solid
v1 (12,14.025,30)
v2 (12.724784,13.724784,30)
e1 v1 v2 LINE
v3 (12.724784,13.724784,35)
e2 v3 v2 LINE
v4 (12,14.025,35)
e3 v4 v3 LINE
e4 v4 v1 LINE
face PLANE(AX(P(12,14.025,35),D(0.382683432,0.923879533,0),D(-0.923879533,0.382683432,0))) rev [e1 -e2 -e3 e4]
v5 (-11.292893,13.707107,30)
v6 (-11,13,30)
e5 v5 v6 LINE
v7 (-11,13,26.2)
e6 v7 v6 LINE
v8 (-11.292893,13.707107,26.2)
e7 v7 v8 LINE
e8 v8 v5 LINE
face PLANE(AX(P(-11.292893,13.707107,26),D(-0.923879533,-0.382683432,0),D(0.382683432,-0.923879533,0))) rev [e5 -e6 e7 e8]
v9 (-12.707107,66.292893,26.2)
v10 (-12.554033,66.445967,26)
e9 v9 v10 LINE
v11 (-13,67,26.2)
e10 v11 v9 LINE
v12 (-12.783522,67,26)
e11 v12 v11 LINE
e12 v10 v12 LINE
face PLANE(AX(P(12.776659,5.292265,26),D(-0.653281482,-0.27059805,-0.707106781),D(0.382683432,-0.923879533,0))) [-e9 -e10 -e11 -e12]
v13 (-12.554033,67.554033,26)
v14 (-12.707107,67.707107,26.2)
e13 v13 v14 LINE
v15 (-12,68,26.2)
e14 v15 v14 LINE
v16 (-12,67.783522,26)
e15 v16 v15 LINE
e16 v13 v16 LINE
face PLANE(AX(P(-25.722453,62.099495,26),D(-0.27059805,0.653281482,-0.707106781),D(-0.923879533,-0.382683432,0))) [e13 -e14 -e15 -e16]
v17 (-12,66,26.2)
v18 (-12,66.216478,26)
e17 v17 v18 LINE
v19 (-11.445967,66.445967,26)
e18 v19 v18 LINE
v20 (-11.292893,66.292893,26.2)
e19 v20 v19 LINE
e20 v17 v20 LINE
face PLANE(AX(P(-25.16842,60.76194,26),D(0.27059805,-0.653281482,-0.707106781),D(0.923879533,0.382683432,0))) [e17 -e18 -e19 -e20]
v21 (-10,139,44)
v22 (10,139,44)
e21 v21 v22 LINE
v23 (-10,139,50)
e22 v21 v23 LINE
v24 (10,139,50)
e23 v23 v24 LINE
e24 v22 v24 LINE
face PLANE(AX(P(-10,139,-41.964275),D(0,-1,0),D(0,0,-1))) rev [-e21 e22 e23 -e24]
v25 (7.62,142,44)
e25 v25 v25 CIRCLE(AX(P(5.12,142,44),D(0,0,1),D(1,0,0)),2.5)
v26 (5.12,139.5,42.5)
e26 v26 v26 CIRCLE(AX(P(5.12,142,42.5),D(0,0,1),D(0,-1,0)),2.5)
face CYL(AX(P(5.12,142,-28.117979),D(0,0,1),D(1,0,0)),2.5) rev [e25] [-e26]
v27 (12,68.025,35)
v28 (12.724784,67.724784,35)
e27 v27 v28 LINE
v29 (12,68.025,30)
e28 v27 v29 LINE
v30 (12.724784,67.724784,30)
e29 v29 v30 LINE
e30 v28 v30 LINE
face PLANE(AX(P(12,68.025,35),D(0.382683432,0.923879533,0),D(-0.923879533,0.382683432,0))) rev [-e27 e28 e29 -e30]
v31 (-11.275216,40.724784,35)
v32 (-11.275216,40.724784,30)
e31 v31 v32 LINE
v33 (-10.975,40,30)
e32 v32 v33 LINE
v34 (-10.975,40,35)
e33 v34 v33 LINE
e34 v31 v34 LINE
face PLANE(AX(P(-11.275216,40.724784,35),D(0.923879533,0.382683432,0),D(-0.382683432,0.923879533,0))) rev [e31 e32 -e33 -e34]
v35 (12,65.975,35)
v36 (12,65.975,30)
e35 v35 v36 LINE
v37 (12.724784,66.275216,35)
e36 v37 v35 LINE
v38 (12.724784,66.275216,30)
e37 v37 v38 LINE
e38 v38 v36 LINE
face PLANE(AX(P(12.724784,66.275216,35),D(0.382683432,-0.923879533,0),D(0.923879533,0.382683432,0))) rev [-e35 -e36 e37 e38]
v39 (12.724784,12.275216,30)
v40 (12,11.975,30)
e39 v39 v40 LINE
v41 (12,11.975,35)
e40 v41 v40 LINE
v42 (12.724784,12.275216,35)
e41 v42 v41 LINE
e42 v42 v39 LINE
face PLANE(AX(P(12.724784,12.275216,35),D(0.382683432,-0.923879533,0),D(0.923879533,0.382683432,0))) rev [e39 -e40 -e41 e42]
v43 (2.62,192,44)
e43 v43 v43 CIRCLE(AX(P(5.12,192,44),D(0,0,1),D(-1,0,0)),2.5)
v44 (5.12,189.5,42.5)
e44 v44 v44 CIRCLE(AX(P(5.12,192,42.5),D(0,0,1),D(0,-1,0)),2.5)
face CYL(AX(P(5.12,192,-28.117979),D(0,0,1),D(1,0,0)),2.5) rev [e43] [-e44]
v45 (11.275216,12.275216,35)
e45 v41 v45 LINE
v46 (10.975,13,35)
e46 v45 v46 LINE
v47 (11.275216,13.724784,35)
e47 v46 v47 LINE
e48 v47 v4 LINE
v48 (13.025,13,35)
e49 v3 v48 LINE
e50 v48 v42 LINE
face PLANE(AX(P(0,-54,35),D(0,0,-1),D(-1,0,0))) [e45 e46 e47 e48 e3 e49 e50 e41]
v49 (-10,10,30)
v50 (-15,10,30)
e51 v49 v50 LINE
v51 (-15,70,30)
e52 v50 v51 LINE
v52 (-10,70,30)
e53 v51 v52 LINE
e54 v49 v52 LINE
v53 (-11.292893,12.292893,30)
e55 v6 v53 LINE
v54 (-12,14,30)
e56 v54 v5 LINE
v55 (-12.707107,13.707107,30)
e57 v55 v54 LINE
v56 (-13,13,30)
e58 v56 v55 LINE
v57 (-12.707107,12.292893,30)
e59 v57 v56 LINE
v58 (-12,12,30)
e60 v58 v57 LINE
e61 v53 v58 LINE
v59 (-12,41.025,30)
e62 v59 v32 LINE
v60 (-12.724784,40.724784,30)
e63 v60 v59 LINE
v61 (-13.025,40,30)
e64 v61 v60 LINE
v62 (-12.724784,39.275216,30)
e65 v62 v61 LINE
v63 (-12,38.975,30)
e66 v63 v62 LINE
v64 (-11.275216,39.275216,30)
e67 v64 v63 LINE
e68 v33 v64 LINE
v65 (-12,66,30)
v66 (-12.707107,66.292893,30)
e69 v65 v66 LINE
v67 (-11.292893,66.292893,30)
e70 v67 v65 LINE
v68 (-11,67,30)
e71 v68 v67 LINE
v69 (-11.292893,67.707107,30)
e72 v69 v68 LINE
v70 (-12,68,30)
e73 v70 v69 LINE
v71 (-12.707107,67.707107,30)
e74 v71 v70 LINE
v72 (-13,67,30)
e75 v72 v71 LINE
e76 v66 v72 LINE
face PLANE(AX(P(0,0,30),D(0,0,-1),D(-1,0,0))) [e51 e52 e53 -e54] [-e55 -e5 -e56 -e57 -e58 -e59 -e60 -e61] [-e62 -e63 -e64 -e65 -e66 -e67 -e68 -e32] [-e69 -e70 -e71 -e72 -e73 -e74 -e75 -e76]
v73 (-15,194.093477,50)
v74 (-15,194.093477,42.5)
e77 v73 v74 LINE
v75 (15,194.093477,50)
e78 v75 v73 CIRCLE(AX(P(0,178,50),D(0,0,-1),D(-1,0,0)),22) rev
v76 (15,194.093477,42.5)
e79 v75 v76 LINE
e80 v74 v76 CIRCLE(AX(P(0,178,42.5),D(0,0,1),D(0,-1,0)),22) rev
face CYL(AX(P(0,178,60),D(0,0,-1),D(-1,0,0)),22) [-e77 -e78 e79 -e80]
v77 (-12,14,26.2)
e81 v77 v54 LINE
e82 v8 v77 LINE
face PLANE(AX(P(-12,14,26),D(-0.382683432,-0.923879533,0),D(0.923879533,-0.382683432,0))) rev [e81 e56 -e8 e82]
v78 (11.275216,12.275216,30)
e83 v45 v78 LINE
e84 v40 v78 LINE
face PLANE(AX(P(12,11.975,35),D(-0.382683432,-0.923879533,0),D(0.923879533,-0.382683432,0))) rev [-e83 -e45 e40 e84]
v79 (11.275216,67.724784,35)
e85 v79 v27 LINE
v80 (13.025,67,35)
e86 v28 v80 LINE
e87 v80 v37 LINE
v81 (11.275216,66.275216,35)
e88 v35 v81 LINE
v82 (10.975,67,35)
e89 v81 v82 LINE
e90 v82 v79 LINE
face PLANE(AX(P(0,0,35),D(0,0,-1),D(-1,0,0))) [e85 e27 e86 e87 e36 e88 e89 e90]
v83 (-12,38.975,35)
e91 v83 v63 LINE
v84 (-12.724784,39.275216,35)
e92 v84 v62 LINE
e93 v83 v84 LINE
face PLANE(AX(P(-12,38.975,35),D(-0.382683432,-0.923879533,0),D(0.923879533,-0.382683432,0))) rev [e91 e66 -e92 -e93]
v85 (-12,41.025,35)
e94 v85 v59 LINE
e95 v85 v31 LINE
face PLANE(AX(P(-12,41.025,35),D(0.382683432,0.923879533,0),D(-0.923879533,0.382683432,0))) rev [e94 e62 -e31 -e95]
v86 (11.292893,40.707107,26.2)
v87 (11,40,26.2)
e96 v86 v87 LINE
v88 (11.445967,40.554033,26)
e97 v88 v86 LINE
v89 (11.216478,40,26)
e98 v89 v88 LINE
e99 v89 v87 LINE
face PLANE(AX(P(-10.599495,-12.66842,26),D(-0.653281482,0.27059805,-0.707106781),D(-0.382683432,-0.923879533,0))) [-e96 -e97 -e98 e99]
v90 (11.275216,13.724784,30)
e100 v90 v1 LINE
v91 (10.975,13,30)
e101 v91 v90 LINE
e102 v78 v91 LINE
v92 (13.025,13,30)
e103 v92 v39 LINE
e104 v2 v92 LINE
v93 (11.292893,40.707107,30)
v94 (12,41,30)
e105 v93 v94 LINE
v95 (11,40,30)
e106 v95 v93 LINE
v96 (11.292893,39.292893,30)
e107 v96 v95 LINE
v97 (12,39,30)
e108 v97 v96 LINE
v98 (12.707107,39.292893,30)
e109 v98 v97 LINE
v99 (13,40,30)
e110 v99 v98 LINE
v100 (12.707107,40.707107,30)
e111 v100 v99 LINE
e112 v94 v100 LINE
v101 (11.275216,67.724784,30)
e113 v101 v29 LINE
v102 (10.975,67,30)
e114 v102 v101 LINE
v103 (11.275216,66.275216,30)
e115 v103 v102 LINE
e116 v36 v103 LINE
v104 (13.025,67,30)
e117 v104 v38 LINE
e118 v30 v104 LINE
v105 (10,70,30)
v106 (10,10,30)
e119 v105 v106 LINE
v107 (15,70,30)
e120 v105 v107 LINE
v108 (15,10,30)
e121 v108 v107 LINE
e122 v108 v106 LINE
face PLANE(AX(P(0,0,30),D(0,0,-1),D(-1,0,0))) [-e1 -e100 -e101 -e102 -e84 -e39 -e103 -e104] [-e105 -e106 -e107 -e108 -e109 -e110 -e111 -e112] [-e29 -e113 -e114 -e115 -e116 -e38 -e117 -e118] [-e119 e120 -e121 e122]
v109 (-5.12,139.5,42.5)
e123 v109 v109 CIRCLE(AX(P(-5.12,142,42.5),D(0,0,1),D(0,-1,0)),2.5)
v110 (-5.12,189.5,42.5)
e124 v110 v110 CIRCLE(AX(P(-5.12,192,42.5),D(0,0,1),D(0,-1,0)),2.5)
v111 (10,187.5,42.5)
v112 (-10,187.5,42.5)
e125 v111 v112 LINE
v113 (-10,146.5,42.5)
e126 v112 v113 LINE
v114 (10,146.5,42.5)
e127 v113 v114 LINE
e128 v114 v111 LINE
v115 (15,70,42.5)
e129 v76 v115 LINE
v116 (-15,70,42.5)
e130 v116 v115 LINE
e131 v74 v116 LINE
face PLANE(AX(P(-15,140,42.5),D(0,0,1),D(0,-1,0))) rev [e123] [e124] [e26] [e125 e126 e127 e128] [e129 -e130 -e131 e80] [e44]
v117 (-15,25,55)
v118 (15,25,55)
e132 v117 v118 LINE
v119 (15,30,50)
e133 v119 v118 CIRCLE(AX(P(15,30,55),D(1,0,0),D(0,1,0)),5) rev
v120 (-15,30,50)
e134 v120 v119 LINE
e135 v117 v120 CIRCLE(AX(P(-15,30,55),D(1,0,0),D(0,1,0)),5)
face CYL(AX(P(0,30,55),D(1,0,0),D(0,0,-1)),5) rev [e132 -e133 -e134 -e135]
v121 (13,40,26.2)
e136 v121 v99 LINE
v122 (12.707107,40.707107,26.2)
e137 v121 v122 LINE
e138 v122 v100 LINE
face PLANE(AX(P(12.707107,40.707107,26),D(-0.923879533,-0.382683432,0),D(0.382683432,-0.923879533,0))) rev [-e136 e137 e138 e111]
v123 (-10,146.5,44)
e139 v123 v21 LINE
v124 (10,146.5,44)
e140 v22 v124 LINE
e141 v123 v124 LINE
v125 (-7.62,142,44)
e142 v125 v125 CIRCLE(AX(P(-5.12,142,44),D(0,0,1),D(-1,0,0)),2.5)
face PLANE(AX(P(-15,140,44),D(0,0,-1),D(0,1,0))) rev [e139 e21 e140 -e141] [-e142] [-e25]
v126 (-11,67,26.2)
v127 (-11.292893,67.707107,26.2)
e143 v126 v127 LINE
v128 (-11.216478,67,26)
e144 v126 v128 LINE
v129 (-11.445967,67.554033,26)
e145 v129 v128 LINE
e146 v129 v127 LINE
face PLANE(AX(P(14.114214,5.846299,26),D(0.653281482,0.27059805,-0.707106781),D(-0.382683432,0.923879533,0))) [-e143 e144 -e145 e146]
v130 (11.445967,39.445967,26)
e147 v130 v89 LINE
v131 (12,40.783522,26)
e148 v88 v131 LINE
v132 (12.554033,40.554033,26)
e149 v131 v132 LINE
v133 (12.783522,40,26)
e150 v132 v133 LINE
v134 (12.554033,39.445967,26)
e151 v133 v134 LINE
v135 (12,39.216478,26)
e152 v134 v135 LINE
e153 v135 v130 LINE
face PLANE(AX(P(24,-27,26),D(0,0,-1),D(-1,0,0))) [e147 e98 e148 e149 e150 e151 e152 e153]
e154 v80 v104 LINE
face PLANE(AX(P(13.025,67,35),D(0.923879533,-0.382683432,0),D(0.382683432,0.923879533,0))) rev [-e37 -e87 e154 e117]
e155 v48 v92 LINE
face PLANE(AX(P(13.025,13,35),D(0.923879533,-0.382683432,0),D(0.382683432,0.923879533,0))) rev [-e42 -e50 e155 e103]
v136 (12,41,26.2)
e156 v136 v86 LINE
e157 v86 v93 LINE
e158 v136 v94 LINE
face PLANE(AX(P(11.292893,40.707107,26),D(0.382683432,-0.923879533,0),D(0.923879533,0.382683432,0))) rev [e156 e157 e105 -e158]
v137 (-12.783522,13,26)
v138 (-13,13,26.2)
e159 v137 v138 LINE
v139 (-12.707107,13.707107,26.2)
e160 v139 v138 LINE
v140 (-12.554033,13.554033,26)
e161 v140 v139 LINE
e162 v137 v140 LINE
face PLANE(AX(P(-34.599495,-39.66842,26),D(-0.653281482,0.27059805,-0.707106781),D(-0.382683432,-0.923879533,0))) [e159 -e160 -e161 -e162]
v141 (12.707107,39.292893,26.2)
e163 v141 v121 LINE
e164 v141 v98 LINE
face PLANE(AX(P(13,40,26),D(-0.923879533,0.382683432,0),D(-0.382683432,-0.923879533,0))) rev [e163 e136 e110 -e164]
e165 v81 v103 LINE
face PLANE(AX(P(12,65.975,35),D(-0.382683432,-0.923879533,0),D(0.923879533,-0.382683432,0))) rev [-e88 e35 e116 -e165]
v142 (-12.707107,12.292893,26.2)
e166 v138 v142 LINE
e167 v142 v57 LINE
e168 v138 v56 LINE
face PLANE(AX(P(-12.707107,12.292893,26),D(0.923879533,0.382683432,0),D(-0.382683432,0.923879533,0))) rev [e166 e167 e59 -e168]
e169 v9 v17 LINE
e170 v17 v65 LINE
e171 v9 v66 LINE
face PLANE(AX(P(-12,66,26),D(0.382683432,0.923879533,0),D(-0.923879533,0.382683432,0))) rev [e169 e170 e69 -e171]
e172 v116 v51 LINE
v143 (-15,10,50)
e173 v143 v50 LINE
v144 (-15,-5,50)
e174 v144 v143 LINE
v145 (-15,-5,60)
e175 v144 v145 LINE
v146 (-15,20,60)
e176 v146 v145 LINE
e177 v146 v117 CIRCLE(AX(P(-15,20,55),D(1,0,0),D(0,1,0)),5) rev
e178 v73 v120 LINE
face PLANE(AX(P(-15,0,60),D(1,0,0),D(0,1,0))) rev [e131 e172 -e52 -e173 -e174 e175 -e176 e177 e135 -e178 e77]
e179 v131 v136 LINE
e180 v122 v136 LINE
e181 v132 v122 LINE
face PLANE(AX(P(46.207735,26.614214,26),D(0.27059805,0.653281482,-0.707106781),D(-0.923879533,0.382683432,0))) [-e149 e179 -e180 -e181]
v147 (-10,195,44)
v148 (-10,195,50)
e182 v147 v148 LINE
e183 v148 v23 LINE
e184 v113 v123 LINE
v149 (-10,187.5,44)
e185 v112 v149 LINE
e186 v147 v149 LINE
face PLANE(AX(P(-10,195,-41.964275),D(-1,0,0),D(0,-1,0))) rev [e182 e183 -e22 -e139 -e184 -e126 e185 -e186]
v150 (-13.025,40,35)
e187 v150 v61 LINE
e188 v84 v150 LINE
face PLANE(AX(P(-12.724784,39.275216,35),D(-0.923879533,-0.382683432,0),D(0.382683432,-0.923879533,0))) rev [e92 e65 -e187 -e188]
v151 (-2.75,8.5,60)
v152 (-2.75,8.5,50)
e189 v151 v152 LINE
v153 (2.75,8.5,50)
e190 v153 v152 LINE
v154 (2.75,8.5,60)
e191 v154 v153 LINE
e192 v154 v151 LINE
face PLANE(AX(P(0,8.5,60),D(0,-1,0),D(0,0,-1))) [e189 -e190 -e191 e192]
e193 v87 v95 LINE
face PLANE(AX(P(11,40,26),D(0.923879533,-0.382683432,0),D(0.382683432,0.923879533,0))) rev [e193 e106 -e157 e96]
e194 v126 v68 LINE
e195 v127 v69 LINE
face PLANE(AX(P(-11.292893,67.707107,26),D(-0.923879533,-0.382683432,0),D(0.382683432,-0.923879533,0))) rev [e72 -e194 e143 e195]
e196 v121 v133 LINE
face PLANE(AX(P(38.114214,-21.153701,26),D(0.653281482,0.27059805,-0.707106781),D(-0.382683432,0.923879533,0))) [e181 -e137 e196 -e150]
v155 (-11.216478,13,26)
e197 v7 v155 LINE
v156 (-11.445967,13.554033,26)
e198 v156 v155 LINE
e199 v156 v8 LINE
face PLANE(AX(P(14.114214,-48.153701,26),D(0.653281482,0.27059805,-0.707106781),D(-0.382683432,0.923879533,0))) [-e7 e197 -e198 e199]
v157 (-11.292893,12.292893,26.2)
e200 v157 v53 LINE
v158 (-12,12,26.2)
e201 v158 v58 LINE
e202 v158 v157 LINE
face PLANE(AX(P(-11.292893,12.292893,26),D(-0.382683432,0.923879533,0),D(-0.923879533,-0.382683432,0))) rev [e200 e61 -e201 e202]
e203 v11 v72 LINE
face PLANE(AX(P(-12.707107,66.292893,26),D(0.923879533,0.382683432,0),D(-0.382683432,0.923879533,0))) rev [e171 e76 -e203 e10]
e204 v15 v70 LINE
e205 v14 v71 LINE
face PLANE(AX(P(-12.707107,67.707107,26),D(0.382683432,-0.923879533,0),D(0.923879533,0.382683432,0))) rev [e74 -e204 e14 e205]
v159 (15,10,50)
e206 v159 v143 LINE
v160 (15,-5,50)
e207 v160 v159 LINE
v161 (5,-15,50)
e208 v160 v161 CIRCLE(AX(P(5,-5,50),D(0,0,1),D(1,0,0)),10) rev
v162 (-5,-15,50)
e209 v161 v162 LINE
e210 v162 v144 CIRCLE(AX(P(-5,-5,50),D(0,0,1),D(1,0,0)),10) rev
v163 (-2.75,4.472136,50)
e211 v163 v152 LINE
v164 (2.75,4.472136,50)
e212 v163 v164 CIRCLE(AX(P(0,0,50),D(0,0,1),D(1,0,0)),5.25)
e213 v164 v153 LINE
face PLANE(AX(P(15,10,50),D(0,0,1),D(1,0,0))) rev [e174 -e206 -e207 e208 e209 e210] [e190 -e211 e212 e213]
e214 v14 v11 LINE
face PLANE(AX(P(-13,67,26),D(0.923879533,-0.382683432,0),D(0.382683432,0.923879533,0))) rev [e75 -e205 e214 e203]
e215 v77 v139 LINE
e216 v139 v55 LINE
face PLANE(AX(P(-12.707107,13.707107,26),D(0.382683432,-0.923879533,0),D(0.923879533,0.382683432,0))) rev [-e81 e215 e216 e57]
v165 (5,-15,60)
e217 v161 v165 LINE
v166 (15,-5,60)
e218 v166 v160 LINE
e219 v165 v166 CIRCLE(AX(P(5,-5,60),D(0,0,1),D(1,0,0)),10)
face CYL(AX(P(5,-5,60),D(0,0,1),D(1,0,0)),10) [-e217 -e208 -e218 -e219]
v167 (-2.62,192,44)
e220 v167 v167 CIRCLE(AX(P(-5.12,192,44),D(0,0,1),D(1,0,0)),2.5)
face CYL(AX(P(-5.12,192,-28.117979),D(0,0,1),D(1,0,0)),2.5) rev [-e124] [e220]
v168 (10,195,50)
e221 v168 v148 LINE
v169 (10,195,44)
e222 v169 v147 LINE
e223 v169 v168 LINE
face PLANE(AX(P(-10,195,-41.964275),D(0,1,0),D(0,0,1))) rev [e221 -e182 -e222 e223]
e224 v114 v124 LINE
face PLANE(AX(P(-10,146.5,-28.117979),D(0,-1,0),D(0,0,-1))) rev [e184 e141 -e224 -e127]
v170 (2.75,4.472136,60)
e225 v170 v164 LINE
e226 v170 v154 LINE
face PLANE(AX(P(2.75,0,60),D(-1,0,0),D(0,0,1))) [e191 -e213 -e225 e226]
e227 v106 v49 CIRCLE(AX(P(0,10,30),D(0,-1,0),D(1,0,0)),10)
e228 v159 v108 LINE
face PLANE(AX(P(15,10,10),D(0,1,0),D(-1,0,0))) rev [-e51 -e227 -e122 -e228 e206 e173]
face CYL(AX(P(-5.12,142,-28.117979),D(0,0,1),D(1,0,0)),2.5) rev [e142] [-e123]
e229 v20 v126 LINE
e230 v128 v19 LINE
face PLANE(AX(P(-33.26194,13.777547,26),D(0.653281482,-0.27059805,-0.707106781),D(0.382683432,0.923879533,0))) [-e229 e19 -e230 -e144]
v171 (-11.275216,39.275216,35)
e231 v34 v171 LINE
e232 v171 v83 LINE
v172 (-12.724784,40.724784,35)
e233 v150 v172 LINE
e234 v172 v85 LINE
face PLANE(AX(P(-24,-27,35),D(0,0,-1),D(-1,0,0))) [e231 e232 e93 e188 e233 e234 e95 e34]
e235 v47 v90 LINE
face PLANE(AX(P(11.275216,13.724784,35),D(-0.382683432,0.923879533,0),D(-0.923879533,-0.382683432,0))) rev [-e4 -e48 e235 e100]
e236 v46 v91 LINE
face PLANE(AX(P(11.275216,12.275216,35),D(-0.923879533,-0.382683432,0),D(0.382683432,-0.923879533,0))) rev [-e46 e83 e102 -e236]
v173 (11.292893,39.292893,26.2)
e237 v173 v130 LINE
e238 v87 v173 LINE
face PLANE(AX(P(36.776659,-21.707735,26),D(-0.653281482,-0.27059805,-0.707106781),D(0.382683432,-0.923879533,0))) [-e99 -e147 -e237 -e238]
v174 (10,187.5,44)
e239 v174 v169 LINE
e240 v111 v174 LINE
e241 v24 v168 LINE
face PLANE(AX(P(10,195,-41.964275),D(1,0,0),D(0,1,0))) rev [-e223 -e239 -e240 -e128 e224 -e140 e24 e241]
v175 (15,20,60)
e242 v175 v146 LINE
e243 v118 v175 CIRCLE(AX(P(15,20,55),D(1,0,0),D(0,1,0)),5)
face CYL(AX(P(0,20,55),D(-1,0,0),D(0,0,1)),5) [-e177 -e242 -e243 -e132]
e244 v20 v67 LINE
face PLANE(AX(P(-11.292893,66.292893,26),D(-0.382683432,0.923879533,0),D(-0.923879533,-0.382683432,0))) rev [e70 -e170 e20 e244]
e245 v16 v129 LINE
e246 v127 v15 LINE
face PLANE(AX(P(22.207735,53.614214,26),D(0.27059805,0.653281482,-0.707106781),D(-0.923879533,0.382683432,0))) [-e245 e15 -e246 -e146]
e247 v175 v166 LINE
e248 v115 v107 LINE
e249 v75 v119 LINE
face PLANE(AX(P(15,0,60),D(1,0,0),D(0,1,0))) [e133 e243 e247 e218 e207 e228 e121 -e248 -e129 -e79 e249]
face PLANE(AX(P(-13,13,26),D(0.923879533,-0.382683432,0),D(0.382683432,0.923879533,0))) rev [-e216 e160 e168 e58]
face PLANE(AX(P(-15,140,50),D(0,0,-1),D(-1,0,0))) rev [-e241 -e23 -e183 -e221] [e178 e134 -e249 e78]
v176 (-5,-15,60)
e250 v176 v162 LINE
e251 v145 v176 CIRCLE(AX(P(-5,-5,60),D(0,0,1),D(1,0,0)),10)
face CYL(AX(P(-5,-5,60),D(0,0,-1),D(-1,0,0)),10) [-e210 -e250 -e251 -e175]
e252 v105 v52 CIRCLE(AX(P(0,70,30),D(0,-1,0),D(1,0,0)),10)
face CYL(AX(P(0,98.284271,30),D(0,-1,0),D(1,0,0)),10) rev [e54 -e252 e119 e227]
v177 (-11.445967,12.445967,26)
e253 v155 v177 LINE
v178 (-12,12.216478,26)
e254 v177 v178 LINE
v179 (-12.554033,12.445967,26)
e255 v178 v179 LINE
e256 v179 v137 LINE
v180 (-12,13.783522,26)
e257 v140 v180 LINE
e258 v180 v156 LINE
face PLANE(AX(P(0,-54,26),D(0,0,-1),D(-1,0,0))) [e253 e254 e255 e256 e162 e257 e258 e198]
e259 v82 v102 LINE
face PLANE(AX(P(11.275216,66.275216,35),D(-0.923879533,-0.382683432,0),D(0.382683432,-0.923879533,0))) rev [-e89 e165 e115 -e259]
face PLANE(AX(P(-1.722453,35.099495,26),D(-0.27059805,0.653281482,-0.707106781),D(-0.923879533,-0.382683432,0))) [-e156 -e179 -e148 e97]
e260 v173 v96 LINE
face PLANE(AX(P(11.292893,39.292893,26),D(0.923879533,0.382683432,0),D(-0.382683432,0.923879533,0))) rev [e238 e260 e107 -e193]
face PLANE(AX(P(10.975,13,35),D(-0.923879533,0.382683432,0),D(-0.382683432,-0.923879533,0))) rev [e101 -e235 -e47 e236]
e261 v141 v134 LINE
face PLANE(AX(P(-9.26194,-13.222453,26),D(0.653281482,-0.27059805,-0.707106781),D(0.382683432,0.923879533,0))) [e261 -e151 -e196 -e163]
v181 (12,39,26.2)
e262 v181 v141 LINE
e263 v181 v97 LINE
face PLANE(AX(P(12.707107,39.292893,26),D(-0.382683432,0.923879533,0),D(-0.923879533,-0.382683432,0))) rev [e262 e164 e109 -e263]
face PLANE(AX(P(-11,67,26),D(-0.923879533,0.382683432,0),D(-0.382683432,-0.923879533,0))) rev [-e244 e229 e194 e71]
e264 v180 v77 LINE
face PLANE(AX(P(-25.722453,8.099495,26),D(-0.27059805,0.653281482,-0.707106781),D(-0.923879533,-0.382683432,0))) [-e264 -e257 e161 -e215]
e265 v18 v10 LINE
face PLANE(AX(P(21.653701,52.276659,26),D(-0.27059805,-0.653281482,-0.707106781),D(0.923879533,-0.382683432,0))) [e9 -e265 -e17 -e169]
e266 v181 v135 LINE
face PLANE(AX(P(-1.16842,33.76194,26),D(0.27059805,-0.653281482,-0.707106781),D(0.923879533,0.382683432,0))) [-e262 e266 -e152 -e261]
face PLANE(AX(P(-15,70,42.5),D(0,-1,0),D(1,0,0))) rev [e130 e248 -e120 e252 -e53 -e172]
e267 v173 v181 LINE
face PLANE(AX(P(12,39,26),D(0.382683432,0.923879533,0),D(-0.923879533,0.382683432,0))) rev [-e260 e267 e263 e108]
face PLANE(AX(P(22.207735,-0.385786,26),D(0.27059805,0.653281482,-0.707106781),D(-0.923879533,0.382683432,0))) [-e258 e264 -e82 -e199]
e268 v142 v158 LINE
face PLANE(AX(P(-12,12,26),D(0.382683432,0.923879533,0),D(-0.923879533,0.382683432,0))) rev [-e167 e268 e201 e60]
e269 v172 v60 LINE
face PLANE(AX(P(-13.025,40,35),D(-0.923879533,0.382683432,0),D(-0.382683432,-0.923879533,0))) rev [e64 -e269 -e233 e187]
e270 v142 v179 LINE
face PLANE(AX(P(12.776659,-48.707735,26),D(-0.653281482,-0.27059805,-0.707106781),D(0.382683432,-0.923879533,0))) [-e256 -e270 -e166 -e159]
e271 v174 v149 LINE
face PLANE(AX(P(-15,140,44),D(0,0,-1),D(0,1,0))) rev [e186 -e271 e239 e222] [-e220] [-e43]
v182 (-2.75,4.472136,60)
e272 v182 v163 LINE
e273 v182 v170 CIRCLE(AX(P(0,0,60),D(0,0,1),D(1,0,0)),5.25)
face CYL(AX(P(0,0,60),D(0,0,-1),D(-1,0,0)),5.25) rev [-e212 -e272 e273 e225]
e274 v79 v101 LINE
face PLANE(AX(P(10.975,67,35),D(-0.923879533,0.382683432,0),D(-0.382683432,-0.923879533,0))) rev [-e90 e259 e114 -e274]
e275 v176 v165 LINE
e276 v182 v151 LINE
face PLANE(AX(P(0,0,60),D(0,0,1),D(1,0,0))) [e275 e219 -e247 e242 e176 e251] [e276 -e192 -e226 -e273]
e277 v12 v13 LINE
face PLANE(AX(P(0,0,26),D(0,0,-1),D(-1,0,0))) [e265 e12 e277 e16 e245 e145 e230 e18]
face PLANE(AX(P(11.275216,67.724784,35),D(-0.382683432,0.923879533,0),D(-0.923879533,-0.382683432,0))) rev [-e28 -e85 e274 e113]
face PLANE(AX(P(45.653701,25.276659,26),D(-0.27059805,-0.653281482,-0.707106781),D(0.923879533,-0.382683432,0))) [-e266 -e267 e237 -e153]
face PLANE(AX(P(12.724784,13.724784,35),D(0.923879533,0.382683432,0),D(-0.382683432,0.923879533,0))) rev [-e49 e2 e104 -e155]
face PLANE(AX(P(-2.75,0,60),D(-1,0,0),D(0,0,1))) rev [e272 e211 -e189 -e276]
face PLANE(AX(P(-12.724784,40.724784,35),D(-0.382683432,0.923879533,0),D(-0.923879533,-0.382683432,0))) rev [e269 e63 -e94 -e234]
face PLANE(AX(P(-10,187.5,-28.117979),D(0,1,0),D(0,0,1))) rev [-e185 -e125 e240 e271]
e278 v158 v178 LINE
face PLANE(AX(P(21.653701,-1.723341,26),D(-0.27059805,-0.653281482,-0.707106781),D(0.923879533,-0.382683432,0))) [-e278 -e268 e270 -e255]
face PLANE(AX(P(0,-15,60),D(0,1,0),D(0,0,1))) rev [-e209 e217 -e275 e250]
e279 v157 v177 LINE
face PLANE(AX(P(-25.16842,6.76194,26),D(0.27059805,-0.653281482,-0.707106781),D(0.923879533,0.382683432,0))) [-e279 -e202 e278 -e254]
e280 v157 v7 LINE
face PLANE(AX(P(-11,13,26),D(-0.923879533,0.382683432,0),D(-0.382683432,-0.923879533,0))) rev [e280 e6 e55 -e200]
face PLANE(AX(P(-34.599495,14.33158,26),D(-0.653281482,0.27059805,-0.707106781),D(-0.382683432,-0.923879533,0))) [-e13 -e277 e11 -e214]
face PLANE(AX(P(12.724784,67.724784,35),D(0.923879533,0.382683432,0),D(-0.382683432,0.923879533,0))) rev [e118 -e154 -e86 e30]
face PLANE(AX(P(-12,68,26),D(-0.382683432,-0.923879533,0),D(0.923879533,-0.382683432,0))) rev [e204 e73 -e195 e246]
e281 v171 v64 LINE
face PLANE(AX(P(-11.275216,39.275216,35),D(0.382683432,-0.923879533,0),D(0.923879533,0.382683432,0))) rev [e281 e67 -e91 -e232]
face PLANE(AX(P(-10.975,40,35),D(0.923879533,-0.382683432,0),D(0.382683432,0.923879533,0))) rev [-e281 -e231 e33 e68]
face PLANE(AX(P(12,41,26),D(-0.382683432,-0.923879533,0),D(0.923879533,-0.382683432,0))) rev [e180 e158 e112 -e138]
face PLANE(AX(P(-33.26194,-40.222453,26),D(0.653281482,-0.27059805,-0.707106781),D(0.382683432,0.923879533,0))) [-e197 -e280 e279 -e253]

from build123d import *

# Parameters (mm, degrees)
SKETCH2_W                              = 30
SKETCH2_H                              = 30
BOSS_EXTRUDE1_DEPTH                    = 60
FILLET1_R                              = 10
SKETCH3_W                              = 40
SKETCH3_H                              = 25
CUT_EXTRUDE1_DEPTH                     = 69.738635424
SKETCH6_W                              = 30
SKETCH6_H                              = 40
BOSS_EXTRUDE2_DEPTH                    = 125
SKETCH7_W                              = 30
SKETCH7_H                              = 10
BOSS_EXTRUDE3_DEPTH                    = 10
FILLET2_START                          = -16
FILLET2_DEPTH                          = 32
FILLET2_START_2                        = -15
FILLET2_2_DEPTH                        = 30
SKETCH8_W                              = 25
SKETCH8_H                              = 70
CUT_EXTRUDE2_DEPTH                     = 156.241746963
SKETCH12_W                             = 30
SKETCH12_H                             = 7.5
BOSS_EXTRUDE4_DEPTH                    = 65
SKETCH13_W                             = 20
SKETCH13_H                             = 56
SERVO_HOLE_OUTER_DEPTH                 = 6
SKETCH20_R                             = 5
BOSS_EXTRUDE5_DEPTH                    = 44
FILLET_FOR_FOREARM_MOVEMENT_DEPTH      = 212.541958013
FILLET_FOR_FOREARM_MOVEMENT_DEPTH_BACK = 212.541958013
SKETCH19_R                             = 2.5
SKETCH19_W                             = 20
SKETCH19_H                             = 41
SERVO_HOLE_INNER_DEPTH                 = 26.5
MAKE_HALF_DEPTH                        = 225.629334512
ONE_MALE_JACK_DEPTH                    = 4
CHAMFER2_SIZE                          = 0.2
MALE_JACKS_COUNT                       = 2
MALE_JACKS_PITCH                       = 24
MALE_JACKS_COUNT_DIR2                  = 3
MALE_JACKS_PITCH_DIR2                  = 27
CHAMFER2_OF_MALE_JACKS_SIZE            = 0.2
ONE_FEMALE_JACK_DEPTH                  = 5
FEMALE_JACKS_COUNT                     = 2
FEMALE_JACKS_PITCH                     = 24
FEMALE_JACKS_COUNT_DIR2                = 3
FEMALE_JACKS_PITCH_DIR2                = 27
SKETCH26_R                             = 10
MAKE_LIGHER_DEPTH                      = 60


with BuildPart() as part:
    # Sketch2 → Boss-Extrude1 (new body)
    with BuildSketch(Plane.XY):
        Rectangle(SKETCH2_W, SKETCH2_H)
        with BuildLine():
            ThreePointArc((5.25, 0), (-2.561737691, -4.582575695), (-2.75, 4.472135955))
            Line((-2.75, 4.472135955), (-2.75, 8.5))
            Line((-2.75, 8.5), (0, 8.5))
            Line((0, 8.5), (2.75, 8.5))
            Line((2.75, 8.5), (2.75, 4.472135955))
            ThreePointArc((2.75, 4.472135955), (4.582575695, 2.561737691), (5.25, 0))
        make_face(mode=Mode.SUBTRACT)
    extrude(amount=BOSS_EXTRUDE1_DEPTH)

    # Fillet1
    fillet1_edges = [part.edges().sort_by_distance(p)[0] for p in [
        (15, -15, 30),
        (-15, -15, 30),
    ]]
    fillet(fillet1_edges, radius=FILLET1_R)

    # Sketch3 → Cut-Extrude1 (cut, through all)
    with BuildSketch(Plane.ZY.offset(15)):
        with Locations((30, -2.5)):
            Rectangle(SKETCH3_W, SKETCH3_H)
    extrude(amount=-CUT_EXTRUDE1_DEPTH, mode=Mode.SUBTRACT)

    # Sketch6 → Boss-Extrude2 (add)
    with BuildSketch(Plane(origin=(0, 15, 0), x_dir=(1, 0, 0), z_dir=(0, 1, 0))):
        with Locations((0, -30)):
            Rectangle(SKETCH6_W, SKETCH6_H)
    extrude(amount=BOSS_EXTRUDE2_DEPTH)

    # Sketch7 → Boss-Extrude3 (add)
    with BuildSketch(Plane(origin=(0, 15, 0), x_dir=(1, 0, 0), z_dir=(0, 1, 0))):
        with Locations((0, -5)):
            Rectangle(SKETCH7_W, SKETCH7_H)
        with Locations((0, -55)):
            Rectangle(SKETCH7_W, SKETCH7_H)
    extrude(amount=BOSS_EXTRUDE3_DEPTH)

    # Fillet2: read off the stored shape, not the designer's step
    # Fillet2 outline → Fillet2 (cut)
    with BuildSketch(Plane.YZ.offset(FILLET2_START)):
        with BuildLine():
            ThreePointArc((25, 5), (23.535533906, 1.464466094), (20, 0))
            Line((20, 0), (25, 0))
            Line((25, 0), (25, 5))
        make_face()
        with BuildLine():
            Line((25, 60), (20, 60))
            ThreePointArc((20, 60), (23.535533906, 58.535533906), (25, 55))
            Line((25, 55), (25, 60))
        make_face()
    extrude(amount=FILLET2_DEPTH, mode=Mode.SUBTRACT)

    # Fillet2 2 outline → Fillet2 2 (add)
    with BuildSketch(Plane.YZ.offset(FILLET2_START_2)):
        with BuildLine():
            Line((25, 10), (25, 5))
            ThreePointArc((25, 5), (26.464466094, 8.535533906), (30, 10))
            Line((30, 10), (25, 10))
        make_face()
        with BuildLine():
            ThreePointArc((30, 50), (26.464466094, 51.464466094), (25, 55))
            Line((25, 55), (25, 50))
            Line((25, 50), (30, 50))
        make_face()
    extrude(amount=FILLET2_2_DEPTH)

    # Sketch8 → Cut-Extrude2 (cut, through all)
    with BuildSketch(Plane(origin=(15, 0, 0), x_dir=(0, 0, -1), z_dir=(1, 0, 0))):
        with Locations((-30, 105)):
            Rectangle(SKETCH8_W, SKETCH8_H)
    extrude(amount=-CUT_EXTRUDE2_DEPTH, mode=Mode.SUBTRACT)

    # Sketch12 → Boss-Extrude4 (add)
    with BuildSketch(Plane(origin=(0, 140, 0), x_dir=(1, 0, 0), z_dir=(0, 1, 0))):
        with Locations((0, -13.75)):
            Rectangle(SKETCH12_W, SKETCH12_H)
        with Locations((0, -46.25)):
            Rectangle(SKETCH12_W, SKETCH12_H)
    extrude(amount=BOSS_EXTRUDE4_DEPTH)

    # Sketch13 → Servo Hole Outer (cut)
    with BuildSketch(Plane.XY.offset(50)):
        with Locations((0, 167)):
            Rectangle(SKETCH13_W, SKETCH13_H)
    extrude(amount=-SERVO_HOLE_OUTER_DEPTH, mode=Mode.SUBTRACT)

    # Sketch20 → Boss-Extrude5 (add)
    with BuildSketch(Plane.XY.offset(44)):
        with Locations(Location((0, 178, 0), (0, 0, 90))):
            Circle(SKETCH20_R)
    extrude(amount=-BOSS_EXTRUDE5_DEPTH)

    # Sketch23 → Fillet for Forearm Movement (cut, two sides: drawn at the far end of the back side and taken through both)
    with BuildSketch(Plane(origin=(0, 0, 10), x_dir=(-1, 0, 0), z_dir=(0, 0, -1)).offset(-FILLET_FOR_FOREARM_MOVEMENT_DEPTH_BACK)):
        with BuildLine():
            Line((-15, 194.093476939), (-15, 205))
            Line((-15, 205), (15, 205))
            Line((15, 205), (15, 194.093476939))
            ThreePointArc((15, 194.093476939), (0, 200), (-15, 194.093476939))
        make_face()
    extrude(amount=FILLET_FOR_FOREARM_MOVEMENT_DEPTH + FILLET_FOR_FOREARM_MOVEMENT_DEPTH_BACK, mode=Mode.SUBTRACT)

    # Sketch19 → Servo Hole Inner (cut)
    with BuildSketch(Plane.XY.offset(44)):
        with Locations((-5.12, 192)):
            Circle(SKETCH19_R)
        with Locations(Location((5.12, 192, 0), (0, 0, 270))):
            Circle(SKETCH19_R)
        with Locations((5.12, 142)):
            Circle(SKETCH19_R)
        with Locations(Location((-5.12, 142, 0), (0, 0, 270))):
            Circle(SKETCH19_R)
        with Locations((0, 167)):
            Rectangle(SKETCH19_W, SKETCH19_H)
    extrude(amount=-SERVO_HOLE_INNER_DEPTH, mode=Mode.SUBTRACT)

    # 3DSketch2 → Make Half (cut, through all)
    with BuildSketch(Plane(origin=(-16.97773478, -20.308334844, 30), x_dir=(0.14055892995616934, 0.9900723141314359, 0), z_dir=(0, 0, 1))):
        Polygon((0, 0), (4.55547701, -32.087976668), (230.577525736, 0), (226.022048726, 32.087976668), align=None)
    extrude(amount=-MAKE_HALF_DEPTH, mode=Mode.SUBTRACT)

    # Sketch24 → One Male Jack (add)
    with BuildSketch(Plane(origin=(0, 0, 30), x_dir=(-1, 0, 0), z_dir=(0, 0, -1))):
        Polygon((13, 67), (12.707106781, 67.707106781), (12, 68), (11.292893219, 67.707106781), (11, 67), (11.292893219, 66.292893219), (12, 66), (12.707106781, 66.292893219), align=None)
    one_male_jack = extrude(amount=ONE_MALE_JACK_DEPTH)

    # Chamfer2
    chamfer2_edges = [part.edges().sort_by_distance(p)[0] for p in [
        (-12.853553391, 66.646446609, 26),
        (-12.853553391, 67.353553391, 26),
        (-12.353553391, 67.853553391, 26),
        (-11.646446609, 67.853553391, 26),
        (-11.146446609, 67.353553391, 26),
        (-11.146446609, 66.646446609, 26),
        (-11.646446609, 66.146446609, 26),
        (-12.353553391, 66.146446609, 26),
    ]]
    chamfer(chamfer2_edges, length=CHAMFER2_SIZE)

    # Male Jacks: One Male Jack 2 × 3, 3 skipped
    with Locations(*[(i * MALE_JACKS_PITCH, -j * MALE_JACKS_PITCH_DIR2, 0) for i in range(MALE_JACKS_COUNT) for j in range(MALE_JACKS_COUNT_DIR2) if (i, j) not in ((0, 0), (0, 1), (1, 0), (1, 2))]):
        add(one_male_jack)

    # Chamfer2 of Male Jacks
    chamfer2_of_male_jacks_edges = [part.edges().sort_by_distance(p)[0] for p in [
        (-12.853553391, 12.646446609, 26),
        (-12.853553391, 13.353553391, 26),
        (-12.353553391, 13.853553391, 26),
        (-11.646446609, 13.853553391, 26),
        (-11.146446609, 13.353553391, 26),
        (-11.146446609, 12.646446609, 26),
        (-11.646446609, 12.146446609, 26),
        (-12.353553391, 12.146446609, 26),
        (11.146446609, 39.646446609, 26),
        (11.146446609, 40.353553391, 26),
        (11.646446609, 40.853553391, 26),
        (12.353553391, 40.853553391, 26),
        (12.853553391, 40.353553391, 26),
        (12.853553391, 39.646446609, 26),
        (12.353553391, 39.146446609, 26),
        (11.646446609, 39.146446609, 26),
    ]]
    chamfer(chamfer2_of_male_jacks_edges, length=CHAMFER2_OF_MALE_JACKS_SIZE)

    # Sketch25 → One Female Jack (cut)
    with BuildSketch(Plane(origin=(0, 0, 30), x_dir=(-1, 0, 0), z_dir=(0, 0, -1))):
        Polygon((-12, 68.025), (-12.724784451, 67.724784451), (-13.025, 67), (-12.724784451, 66.275215549), (-12, 65.975), (-11.275215549, 66.275215549), (-10.975, 67), (-11.275215549, 67.724784451), align=None)
    one_female_jack = extrude(amount=-ONE_FEMALE_JACK_DEPTH, mode=Mode.SUBTRACT)

    # Female Jacks: One Female Jack 2 × 3, 3 skipped
    with Locations(*[(-i * FEMALE_JACKS_PITCH, -j * FEMALE_JACKS_PITCH_DIR2, 0) for i in range(FEMALE_JACKS_COUNT) for j in range(FEMALE_JACKS_COUNT_DIR2) if (i, j) not in ((0, 0), (0, 1), (1, 0), (1, 2))]):
        add(one_female_jack, mode=Mode.SUBTRACT)

    # Sketch26 → Make Ligher (cut)
    with BuildSketch(Plane.XZ.offset(-10)):
        with Locations((0, 30)):
            Circle(SKETCH26_R)
    extrude(amount=-MAKE_LIGHER_DEPTH, mode=Mode.SUBTRACT)


solid = part.part
